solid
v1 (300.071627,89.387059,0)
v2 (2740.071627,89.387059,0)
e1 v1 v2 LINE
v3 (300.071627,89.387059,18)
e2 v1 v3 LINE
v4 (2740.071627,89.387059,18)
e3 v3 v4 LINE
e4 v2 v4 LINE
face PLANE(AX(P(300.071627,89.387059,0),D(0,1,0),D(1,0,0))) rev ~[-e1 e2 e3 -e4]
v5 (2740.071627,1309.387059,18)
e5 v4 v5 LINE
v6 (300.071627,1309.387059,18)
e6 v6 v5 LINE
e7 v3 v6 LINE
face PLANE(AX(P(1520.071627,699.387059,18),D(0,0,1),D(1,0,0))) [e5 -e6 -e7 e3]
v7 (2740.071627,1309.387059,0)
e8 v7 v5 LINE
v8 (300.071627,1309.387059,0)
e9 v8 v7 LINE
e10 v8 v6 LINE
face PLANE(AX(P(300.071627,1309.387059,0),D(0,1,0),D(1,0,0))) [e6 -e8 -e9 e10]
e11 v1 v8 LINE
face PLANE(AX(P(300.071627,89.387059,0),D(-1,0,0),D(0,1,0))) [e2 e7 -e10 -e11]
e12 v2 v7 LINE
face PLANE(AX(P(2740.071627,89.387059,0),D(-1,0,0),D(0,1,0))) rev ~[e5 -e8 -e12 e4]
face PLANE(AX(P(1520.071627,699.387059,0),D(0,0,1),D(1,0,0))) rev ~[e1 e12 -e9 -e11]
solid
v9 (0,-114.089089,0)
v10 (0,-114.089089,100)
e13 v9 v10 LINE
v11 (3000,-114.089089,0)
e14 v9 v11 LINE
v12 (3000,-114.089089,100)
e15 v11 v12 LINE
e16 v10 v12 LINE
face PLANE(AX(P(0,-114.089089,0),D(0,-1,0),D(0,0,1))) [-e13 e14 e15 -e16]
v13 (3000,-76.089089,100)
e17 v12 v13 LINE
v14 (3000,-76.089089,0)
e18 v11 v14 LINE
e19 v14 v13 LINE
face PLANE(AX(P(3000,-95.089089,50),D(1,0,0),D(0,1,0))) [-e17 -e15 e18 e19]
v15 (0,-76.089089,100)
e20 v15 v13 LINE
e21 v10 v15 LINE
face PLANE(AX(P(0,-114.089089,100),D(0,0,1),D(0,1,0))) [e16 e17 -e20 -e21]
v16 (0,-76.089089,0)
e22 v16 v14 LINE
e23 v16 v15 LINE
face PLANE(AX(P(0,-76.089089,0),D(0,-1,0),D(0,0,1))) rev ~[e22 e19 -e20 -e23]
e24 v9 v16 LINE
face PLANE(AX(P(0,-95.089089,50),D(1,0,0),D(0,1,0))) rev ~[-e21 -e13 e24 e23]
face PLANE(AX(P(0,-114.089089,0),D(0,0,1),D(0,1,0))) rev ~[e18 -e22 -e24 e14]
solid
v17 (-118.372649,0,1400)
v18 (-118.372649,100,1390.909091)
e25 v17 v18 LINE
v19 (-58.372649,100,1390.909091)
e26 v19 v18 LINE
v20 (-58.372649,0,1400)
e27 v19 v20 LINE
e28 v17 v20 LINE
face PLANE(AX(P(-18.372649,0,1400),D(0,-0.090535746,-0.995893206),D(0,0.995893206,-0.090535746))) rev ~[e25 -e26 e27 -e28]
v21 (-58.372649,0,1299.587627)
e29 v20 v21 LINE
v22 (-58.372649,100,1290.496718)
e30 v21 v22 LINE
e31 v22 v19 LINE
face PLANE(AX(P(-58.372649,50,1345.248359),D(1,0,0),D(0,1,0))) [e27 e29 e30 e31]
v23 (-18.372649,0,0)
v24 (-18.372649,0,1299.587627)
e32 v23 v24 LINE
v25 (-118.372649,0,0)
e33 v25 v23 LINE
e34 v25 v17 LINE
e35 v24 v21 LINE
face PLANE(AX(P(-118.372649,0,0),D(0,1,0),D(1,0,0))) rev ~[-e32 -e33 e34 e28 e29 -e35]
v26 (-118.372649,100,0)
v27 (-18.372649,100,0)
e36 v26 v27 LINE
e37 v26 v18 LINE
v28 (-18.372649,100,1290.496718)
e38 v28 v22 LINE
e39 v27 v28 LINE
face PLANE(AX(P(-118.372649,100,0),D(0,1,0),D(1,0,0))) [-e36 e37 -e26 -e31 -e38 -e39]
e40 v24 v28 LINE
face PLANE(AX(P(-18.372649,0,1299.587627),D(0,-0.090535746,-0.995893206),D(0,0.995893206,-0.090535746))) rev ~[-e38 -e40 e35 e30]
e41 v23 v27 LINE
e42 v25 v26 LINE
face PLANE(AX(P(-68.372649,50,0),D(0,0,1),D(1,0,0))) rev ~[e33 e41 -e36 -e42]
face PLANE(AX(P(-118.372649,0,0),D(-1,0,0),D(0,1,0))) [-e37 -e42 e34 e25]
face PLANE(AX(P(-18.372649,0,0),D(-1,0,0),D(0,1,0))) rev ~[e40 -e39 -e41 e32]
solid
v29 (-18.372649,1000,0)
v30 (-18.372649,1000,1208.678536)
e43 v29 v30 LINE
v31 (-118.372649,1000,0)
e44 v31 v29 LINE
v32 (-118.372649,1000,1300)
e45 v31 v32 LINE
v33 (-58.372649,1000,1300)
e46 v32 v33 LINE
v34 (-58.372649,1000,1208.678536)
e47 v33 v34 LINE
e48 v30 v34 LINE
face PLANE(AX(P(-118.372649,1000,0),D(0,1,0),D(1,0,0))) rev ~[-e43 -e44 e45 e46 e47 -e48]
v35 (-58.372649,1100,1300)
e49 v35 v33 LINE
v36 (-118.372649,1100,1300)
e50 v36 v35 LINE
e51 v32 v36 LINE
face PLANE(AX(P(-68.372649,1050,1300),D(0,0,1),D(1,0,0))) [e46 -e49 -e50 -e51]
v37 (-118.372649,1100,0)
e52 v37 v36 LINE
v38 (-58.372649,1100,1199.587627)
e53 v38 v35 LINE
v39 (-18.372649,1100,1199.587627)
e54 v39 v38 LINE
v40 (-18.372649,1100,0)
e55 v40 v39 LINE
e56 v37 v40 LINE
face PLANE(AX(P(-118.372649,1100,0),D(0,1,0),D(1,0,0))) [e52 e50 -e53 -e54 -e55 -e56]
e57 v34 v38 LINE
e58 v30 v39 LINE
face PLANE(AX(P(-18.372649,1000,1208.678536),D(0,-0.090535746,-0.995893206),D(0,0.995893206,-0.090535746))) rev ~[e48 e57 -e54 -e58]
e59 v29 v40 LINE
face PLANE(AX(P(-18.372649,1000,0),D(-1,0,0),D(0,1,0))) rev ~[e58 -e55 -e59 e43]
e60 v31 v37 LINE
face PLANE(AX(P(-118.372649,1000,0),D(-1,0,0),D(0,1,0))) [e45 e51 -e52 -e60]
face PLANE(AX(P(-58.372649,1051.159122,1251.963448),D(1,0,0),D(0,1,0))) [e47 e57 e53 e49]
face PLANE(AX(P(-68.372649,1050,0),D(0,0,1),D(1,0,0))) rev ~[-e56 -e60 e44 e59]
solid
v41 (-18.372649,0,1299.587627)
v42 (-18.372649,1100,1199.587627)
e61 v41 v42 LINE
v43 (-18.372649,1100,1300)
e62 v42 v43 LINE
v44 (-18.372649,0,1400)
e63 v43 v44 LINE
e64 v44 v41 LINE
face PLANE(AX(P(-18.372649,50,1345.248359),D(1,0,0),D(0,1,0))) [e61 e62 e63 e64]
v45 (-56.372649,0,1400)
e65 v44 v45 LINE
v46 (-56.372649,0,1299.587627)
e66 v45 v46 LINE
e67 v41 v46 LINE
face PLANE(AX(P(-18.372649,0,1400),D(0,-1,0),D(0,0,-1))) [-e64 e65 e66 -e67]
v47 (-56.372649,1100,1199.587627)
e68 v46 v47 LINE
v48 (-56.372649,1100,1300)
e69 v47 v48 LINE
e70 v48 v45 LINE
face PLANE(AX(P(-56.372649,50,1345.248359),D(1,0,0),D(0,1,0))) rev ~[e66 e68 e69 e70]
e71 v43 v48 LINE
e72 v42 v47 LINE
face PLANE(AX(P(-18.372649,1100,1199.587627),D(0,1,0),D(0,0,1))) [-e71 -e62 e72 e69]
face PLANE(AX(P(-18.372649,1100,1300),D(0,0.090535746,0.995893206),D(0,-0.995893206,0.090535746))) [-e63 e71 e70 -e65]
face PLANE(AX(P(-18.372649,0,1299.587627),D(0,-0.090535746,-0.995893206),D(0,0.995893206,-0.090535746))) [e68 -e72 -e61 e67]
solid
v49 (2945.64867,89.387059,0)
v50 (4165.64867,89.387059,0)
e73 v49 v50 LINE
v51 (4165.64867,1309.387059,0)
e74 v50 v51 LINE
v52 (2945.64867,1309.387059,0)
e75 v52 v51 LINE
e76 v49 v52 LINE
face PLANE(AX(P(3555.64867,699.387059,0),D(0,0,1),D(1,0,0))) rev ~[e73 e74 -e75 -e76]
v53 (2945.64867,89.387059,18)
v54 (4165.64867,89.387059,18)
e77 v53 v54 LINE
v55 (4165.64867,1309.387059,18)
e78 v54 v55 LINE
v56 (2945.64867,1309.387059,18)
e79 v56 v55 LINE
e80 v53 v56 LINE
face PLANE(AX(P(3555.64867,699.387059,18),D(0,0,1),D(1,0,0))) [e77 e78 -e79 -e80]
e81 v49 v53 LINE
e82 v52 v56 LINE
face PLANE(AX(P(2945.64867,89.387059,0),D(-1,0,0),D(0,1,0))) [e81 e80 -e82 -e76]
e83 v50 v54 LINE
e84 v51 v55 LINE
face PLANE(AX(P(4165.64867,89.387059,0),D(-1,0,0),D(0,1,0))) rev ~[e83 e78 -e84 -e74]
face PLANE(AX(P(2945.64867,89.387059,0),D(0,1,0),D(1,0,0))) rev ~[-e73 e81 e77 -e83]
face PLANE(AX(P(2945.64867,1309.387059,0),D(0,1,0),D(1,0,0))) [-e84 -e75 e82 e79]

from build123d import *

# Parameters (mm, degrees)
F0_W      = 100
F0_H      = 100
F1_DEPTH  = 1400
F2_DEPTH  = 1300
F3_W      = 38
F3_H      = 100
F4_DEPTH  = 3000
F5_W      = 2440
F5_H      = 1220
F6_DEPTH  = 18
F5_W_2    = 1220
F8_DEPTH  = 100
F9_DEPTH  = 40
F10_DEPTH = 38


# Not quite as in the source:
# - a feature names something its author has since deleted; it is built from what else it names


with BuildPart() as f1:
    # F0 (on Top) → F1 (new body)
    with BuildSketch(Plane.XY):
        with Locations((-68.3726489544, 50)):
            Rectangle(F0_W, F0_H)
    extrude(amount=F1_DEPTH)

    # F7 (on face) → F8 (cut, through all)
    with BuildSketch(Plane.YZ.offset(-18.3726489544)):
        Polygon((0, 1400), (100, 1390.9090909091), (100, 1400), align=None)
    extrude(amount=-F8_DEPTH, mode=Mode.SUBTRACT)


with BuildPart() as f2:
    # F0 (on Top) → F2 (new body)
    with BuildSketch(Plane.XY):
        with Locations((-68.3726489544, 1050)):
            Rectangle(F0_W, F0_H)
    extrude(amount=F2_DEPTH)


with BuildPart() as f4:
    # F3 (on Right) → F4 (new body)
    with BuildSketch(Plane.YZ):
        with Locations((-95.0890891392, 50)):
            Rectangle(F3_W, F3_H)
    extrude(amount=F4_DEPTH)


with BuildPart() as f6:
    # F5 (on Top) → F6 (new body)
    with BuildSketch(Plane.XY):
        with Locations((1520.0716269016, 699.3870592117)):
            Rectangle(F5_W, F5_H)
    extrude(amount=F6_DEPTH)


with BuildPart() as f6b:
    # F5 (on Top) → F6, piece 2 (new body)
    with BuildSketch(Plane.XY):
        with Locations((3555.6486701965, 699.3870592117)):
            Rectangle(F5_W_2, F5_H)
    extrude(amount=F6_DEPTH)


with BuildPart() as f9_tool:
    # F7 (on face) → F9 (new body)
    with BuildSketch(Plane.YZ.offset(-18.3726489544)):
        Polygon((0, 1299.5876271165), (100, 1290.4967180256), (100, 1390.9090909091), (0, 1400), align=None)
        Polygon((1000, 1300), (1000, 1208.6785362074), (1100, 1199.5876271165), (1100, 1300), align=None)
    extrude(amount=-F9_DEPTH)


with BuildPart() as f1_1:
    add(f1.part)

    # F9: cut by f9_tool
    add(f9_tool.part, mode=Mode.SUBTRACT)


with BuildPart() as f2_1:
    add(f2.part)

    # F9: cut by f9_tool
    add(f9_tool.part, mode=Mode.SUBTRACT)


with BuildPart() as f10:
    # F7 (on face) → F10 (new body)
    with BuildSketch(Plane.YZ.offset(-18.3726489544)):
        Polygon((0, 1299.5876271165), (100, 1290.4967180256), (100, 1390.9090909091), (0, 1400), align=None)
        Polygon((1000, 1309.0909090909), (1000, 1300), (1100, 1300), align=None)
        Polygon((1000, 1300), (1000, 1208.6785362074), (1100, 1199.5876271165), (1100, 1300), align=None)
        Polygon((100, 1290.4967180256), (1000, 1208.6785362074), (1000, 1300), (1000, 1309.0909090909), (100, 1390.9090909091), align=None)
    extrude(amount=-F10_DEPTH)


solid = Compound([f4.part, f6.part, f6b.part, f1_1.part, f2_1.part, f10.part])
